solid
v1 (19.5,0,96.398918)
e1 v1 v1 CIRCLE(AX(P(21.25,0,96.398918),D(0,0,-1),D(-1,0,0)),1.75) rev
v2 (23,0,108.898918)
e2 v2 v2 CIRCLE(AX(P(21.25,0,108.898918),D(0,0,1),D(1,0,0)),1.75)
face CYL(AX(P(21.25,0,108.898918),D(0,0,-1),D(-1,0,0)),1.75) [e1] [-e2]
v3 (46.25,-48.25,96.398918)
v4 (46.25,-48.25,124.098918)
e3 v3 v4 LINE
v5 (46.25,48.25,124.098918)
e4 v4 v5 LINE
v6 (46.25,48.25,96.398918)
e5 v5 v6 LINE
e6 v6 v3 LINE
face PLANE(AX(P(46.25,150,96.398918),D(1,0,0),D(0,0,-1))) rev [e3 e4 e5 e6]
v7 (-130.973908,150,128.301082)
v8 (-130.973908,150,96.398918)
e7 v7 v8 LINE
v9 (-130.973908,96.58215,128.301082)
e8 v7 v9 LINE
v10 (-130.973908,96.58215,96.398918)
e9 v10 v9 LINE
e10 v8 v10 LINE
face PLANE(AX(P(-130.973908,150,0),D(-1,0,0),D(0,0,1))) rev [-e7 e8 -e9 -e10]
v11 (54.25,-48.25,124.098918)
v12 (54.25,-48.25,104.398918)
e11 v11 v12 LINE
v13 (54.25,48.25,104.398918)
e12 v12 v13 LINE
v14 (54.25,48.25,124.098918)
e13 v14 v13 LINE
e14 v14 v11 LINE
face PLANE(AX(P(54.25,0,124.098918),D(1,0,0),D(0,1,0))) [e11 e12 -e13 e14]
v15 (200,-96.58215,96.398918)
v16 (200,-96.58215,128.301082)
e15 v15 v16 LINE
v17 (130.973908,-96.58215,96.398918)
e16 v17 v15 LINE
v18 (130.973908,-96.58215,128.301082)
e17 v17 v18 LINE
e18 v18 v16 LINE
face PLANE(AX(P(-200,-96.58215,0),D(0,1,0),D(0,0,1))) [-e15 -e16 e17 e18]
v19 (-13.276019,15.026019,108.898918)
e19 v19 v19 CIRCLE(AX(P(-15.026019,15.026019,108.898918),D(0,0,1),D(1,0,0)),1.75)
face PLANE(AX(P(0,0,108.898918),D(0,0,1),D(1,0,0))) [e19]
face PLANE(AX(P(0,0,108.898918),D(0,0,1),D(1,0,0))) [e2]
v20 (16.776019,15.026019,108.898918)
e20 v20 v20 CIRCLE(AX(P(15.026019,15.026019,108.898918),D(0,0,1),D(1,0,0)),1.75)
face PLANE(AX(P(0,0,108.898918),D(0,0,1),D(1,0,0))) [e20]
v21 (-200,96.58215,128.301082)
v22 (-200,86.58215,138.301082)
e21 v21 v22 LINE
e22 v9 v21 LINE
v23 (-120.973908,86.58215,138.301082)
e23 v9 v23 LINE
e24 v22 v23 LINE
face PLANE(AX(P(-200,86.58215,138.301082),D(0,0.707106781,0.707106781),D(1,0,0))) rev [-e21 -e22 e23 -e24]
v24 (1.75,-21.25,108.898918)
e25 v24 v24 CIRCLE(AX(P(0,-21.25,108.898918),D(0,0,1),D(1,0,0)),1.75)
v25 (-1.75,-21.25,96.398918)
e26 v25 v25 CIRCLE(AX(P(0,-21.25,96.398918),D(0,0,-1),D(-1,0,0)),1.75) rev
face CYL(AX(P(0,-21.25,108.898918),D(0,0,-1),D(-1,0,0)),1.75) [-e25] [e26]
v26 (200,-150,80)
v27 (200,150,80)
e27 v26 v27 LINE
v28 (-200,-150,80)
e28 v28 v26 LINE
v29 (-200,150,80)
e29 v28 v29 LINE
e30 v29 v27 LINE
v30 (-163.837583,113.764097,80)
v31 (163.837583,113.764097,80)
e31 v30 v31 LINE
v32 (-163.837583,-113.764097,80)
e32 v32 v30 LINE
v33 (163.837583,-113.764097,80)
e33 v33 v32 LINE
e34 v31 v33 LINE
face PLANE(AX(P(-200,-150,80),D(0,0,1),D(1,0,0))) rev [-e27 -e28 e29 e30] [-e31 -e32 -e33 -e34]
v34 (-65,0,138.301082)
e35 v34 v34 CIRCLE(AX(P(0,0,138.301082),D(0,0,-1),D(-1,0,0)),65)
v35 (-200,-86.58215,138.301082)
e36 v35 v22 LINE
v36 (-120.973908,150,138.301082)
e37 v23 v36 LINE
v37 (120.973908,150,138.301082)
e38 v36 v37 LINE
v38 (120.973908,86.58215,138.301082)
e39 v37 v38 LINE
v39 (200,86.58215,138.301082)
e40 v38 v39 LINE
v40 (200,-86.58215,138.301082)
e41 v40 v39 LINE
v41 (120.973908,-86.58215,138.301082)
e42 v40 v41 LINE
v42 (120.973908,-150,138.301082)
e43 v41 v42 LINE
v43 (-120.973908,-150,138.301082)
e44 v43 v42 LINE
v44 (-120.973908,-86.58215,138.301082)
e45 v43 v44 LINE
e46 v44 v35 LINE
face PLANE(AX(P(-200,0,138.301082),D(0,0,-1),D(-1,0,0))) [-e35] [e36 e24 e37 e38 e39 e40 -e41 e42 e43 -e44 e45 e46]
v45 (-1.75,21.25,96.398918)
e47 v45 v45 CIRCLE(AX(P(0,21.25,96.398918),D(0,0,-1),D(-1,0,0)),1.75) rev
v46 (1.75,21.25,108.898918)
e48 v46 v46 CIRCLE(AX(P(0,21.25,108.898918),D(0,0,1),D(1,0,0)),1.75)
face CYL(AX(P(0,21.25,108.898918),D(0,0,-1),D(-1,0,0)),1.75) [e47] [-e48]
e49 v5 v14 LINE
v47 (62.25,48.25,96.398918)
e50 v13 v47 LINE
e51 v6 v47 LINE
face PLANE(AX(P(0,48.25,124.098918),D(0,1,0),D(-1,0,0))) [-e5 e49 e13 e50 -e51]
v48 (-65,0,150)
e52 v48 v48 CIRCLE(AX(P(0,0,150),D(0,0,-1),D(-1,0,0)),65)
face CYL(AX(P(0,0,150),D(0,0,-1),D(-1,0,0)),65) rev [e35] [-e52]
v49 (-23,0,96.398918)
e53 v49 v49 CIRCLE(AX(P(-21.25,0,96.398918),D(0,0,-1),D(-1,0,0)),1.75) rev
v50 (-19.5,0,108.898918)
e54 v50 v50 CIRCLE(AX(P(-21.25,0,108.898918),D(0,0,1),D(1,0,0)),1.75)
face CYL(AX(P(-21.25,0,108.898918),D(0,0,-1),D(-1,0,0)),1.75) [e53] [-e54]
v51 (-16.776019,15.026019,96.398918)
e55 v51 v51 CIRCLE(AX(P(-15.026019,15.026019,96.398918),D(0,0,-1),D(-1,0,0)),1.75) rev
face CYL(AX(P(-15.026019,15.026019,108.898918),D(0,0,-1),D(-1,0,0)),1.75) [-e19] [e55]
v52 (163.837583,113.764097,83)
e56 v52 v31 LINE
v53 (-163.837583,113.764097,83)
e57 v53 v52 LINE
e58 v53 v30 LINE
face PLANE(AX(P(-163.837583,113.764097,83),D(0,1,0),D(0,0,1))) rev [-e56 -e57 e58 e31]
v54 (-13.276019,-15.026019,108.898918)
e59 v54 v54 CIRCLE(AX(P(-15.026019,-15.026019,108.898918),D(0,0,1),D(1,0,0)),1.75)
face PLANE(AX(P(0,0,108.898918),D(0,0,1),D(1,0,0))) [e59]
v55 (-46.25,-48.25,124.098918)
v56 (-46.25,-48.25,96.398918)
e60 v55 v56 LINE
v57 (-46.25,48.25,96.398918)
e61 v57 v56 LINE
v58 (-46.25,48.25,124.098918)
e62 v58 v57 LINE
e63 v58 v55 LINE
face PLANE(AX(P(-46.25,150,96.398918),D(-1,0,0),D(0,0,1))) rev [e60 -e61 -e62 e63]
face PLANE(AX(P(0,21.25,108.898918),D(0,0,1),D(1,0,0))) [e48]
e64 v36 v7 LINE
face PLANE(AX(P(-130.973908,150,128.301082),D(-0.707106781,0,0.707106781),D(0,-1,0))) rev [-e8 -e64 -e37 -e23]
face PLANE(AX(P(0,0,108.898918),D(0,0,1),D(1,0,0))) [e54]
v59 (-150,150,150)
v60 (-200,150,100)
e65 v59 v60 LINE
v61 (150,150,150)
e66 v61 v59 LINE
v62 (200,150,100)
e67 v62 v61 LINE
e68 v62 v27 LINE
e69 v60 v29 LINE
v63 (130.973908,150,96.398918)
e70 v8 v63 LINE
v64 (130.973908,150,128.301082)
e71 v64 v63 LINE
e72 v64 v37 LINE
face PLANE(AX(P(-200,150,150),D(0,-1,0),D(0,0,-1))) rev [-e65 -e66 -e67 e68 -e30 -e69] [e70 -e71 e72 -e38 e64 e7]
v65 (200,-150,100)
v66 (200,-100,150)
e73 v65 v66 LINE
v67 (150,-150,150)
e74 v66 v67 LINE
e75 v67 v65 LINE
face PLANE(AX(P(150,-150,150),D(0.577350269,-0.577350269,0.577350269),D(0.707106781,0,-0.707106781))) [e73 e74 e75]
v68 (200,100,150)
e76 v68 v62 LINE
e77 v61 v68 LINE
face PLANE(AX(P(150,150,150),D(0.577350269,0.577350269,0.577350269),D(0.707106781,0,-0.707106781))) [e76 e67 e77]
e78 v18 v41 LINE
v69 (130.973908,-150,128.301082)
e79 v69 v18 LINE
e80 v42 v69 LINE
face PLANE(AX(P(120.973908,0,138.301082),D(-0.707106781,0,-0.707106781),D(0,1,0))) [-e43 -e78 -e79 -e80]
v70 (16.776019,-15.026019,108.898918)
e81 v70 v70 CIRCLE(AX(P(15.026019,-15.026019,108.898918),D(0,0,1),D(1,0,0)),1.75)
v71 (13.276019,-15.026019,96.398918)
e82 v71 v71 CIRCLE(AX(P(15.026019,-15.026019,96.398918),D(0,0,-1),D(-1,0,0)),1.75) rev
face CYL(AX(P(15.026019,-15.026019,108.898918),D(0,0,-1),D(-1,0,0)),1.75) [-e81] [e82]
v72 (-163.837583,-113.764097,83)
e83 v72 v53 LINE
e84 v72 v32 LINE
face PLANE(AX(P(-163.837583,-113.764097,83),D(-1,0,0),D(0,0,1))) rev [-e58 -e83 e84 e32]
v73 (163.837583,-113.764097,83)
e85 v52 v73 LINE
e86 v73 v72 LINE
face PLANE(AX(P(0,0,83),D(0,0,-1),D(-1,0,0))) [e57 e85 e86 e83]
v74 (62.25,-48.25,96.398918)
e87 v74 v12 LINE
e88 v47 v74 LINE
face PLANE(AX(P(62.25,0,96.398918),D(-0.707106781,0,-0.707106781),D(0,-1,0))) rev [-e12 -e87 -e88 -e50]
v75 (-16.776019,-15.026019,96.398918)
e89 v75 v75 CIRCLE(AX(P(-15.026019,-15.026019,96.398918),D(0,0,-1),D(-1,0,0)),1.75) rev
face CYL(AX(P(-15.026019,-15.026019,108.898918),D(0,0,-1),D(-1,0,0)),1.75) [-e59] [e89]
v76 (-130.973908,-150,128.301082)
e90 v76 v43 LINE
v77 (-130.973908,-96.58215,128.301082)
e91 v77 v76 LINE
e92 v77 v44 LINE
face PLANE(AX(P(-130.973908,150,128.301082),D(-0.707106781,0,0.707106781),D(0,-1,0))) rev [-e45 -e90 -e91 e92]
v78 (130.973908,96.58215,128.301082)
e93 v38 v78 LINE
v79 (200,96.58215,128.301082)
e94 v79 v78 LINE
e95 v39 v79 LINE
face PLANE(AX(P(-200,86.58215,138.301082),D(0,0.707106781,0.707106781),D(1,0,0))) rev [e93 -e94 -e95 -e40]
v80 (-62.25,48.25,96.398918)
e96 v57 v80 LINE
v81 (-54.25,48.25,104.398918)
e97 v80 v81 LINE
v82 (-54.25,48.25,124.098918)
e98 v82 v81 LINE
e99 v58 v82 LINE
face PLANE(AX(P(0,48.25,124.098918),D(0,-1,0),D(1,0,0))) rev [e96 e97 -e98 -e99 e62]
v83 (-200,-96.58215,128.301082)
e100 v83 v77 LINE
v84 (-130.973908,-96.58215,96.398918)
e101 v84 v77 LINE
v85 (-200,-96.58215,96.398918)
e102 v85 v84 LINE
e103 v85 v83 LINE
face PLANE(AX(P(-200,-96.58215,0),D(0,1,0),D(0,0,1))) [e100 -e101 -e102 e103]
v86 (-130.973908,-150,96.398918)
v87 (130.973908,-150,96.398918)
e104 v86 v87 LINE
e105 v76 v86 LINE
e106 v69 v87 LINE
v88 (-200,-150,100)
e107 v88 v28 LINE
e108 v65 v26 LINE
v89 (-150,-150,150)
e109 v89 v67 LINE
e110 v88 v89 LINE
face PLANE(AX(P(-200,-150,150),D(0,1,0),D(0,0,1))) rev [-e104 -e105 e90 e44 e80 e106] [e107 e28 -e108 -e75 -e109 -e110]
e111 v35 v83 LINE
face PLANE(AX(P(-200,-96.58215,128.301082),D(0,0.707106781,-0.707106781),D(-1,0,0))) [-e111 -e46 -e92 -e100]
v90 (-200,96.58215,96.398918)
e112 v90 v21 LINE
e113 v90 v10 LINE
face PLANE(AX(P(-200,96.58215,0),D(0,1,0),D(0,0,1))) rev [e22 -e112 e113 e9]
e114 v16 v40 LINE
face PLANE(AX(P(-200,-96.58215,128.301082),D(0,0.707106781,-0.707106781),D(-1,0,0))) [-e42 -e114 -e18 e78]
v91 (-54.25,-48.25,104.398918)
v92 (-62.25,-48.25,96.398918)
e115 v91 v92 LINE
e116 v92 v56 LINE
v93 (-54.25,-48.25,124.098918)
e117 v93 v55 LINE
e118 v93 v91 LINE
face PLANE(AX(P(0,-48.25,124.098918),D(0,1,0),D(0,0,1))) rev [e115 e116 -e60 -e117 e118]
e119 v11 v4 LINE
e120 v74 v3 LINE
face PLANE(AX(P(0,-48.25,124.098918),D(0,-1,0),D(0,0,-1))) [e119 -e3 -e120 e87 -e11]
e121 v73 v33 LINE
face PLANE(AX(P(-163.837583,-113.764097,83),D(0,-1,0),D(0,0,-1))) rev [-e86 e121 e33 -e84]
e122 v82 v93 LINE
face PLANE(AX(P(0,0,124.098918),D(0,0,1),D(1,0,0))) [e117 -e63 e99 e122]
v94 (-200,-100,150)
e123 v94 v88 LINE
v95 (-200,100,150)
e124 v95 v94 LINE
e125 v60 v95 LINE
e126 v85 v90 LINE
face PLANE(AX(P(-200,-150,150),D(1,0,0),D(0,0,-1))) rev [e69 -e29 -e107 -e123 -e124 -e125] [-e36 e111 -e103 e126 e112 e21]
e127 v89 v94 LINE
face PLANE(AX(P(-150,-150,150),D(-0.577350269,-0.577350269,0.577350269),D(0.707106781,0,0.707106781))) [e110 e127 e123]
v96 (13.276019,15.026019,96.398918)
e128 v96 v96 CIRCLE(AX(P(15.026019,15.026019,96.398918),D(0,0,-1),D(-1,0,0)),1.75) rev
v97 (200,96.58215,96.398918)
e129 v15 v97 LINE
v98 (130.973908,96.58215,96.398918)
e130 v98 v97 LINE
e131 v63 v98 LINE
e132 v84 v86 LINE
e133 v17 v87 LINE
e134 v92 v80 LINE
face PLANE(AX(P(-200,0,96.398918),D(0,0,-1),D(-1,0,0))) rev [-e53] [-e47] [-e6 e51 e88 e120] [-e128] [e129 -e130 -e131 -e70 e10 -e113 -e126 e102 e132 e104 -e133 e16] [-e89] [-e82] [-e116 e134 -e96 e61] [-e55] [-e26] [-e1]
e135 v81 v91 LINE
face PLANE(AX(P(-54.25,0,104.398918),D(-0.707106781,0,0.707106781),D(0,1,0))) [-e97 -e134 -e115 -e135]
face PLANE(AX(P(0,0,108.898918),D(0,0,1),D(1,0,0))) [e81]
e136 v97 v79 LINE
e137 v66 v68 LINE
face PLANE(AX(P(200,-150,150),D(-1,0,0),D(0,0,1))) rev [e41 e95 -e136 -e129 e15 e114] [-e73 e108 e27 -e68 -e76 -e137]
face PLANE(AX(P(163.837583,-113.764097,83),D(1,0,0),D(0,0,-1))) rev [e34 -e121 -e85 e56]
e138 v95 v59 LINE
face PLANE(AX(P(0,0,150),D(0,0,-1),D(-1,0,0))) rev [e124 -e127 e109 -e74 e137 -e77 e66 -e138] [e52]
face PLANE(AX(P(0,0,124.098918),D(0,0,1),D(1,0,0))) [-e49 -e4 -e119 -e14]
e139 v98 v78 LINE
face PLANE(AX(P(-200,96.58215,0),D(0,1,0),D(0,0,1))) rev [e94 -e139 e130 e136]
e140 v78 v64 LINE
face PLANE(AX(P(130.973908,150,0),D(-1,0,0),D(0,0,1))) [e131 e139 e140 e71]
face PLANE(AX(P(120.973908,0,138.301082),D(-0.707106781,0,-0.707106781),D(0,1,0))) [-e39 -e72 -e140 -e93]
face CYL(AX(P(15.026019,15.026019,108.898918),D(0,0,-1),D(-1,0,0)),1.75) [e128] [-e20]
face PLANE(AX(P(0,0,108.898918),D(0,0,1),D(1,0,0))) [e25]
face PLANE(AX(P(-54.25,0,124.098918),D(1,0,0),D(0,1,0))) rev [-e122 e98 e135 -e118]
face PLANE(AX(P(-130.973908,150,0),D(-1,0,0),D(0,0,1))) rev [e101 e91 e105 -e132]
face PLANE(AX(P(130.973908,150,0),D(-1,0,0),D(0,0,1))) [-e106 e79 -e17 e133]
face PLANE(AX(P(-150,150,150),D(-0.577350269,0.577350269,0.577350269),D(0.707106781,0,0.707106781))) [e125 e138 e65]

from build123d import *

# Parameters (mm, degrees)
SKETCH_4_W           = 400
SKETCH_4_H           = 300
EXTRUDE_1_DEPTH      = 150
SKETCH_5_R           = 48.25
CUT_EXTRUDE_1_DEPTH  = 42.3
SKETCH_6_W           = 96.5
SKETCH_6_H           = 19.3
CUT_EXTRUDE_2_DEPTH  = 391.512483795
CUT_EXTRUDE_3_DEPTH  = 453.769256907
SKETCH_8_W           = 326
SKETCH_8_H           = 226
CUT_EXTRUDE_5_DEPTH  = 10
SKETCH_9_R           = 48.25
CUT_EXTRUDE_6_DEPTH  = 10
CHAMFER_START        = 259.807621135
CHAMFER_1_OUTLINE_W  = 65
CHAMFER_1_OUTLINE_H  = 74
CHAMFER_1_DEPTH      = 30.192378865
CHAMFER_START_2      = -290
CHAMFER_2_OUTLINE_W  = 64
CHAMFER_2_OUTLINE_H  = 74
CHAMFER_2_DEPTH      = 30.192378865
CHAMFER_3_OUTLINE_W  = 64
CHAMFER_3_OUTLINE_H  = 74
CHAMFER_3_DEPTH      = 30.192378865
CHAMFER_4_OUTLINE_W  = 65
CHAMFER_4_OUTLINE_H  = 74
CHAMFER_4_DEPTH      = 30.192378865
SKETCH_10_W          = 400
SKETCH_10_H          = 50
CUT_EXTRUDE_7_DEPTH  = 391.512483795
SKETCH_11_W          = 340
SKETCH_11_H          = 240
CUT_EXTRUDE_8_DEPTH  = 10
SKETCH_12_W          = 400
SKETCH_12_H          = 30
CUT_EXTRUDE_9_DEPTH  = 391.512483795
SKETCH_13_W          = 41.9021645
SKETCH_13_H          = 193.164300696
SKETCH_13_W_2        = 19.3
SKETCH_13_H_2        = 96.5
CUT_EXTRUDE_10_DEPTH = 453.769256907
SKETCH_14_W          = 261.947815576
SKETCH_14_H          = 41.9021645
SKETCH_14_W_2        = 96.5
SKETCH_14_H_2        = 19.3
CUT_EXTRUDE_11_DEPTH = 391.512483795
SKETCH_16_R          = 65
SKETCH_16_R_2        = 48.25
CUT_EXTRUDE_12_DEPTH = 257.708036866
CHAMFER_5_SIZE       = 10
SKETCH_17_W          = 10
SKETCH_17_H          = 96.5
EXTRUDE_4_DEPTH      = 27.7
SKETCH_19_R          = 1.75
EXTRUDE_6_DEPTH      = 12.5
SKETCH_20_W          = 2
SKETCH_20_H          = 27.7
CUT_EXTRUDE_13_DEPTH = 320.065921872
CHAMFER_6_SIZE       = 8
SKETCH_21_W          = 327.675165592
SKETCH_21_H          = 227.528194438
CUT_EXTRUDE_14_DEPTH = 3


with BuildPart() as part:
    # 草图4 → 凸台-拉伸1 (new body)
    with BuildSketch(Plane.XY):
        Rectangle(SKETCH_4_W, SKETCH_4_H)
    extrude(amount=EXTRUDE_1_DEPTH)

    # 草图5 → 切除-拉伸1 (cut)
    with BuildSketch(Plane.XY.offset(150)):
        Circle(SKETCH_5_R)
    extrude(amount=-CUT_EXTRUDE_1_DEPTH, mode=Mode.SUBTRACT)

    # 草图6 → 切除-拉伸2 (cut, through all)
    with BuildSketch(Plane.XZ.offset(150)):
        with Locations((0, 117.35)):
            Rectangle(SKETCH_6_W, SKETCH_6_H)
    extrude(amount=-CUT_EXTRUDE_2_DEPTH, mode=Mode.SUBTRACT)

    # 草图7 → 切除-拉伸3 (cut, through all)
    with BuildSketch(Plane.ZY.offset(200)):
        Polygon((127, -48.25), (107.7, -48.25), (107.7, 48.25), (127, 48.25), (127, 0), align=None)
    extrude(amount=-CUT_EXTRUDE_3_DEPTH, mode=Mode.SUBTRACT)

    # 草图8 → 切除-拉伸5 (cut)
    with BuildSketch(Plane(origin=(0, 0, 0), x_dir=(-1, 0, 0), z_dir=(0, 0, -1))):
        Rectangle(SKETCH_8_W, SKETCH_8_H)
    extrude(amount=-CUT_EXTRUDE_5_DEPTH, mode=Mode.SUBTRACT)

    # 草图9 → 切除-拉伸6 (cut)
    with BuildSketch(Plane.XY.offset(107.7)):
        Circle(SKETCH_9_R)
    extrude(amount=-CUT_EXTRUDE_6_DEPTH, mode=Mode.SUBTRACT)

    # 倒角1: read off the stored shape, not the designer's step
    # 倒角1 outline → 倒角1 (cut)
    with BuildSketch(Plane(origin=(0, 0, 0), x_dir=(0.8164965809277258, -0.40824829046386313, -0.40824829046386313), z_dir=(0.5773502691896258, 0.5773502691896258, 0.5773502691896258)).offset(CHAMFER_START)):
        with Locations((30.5, 0)):
            Rectangle(CHAMFER_1_OUTLINE_W, CHAMFER_1_OUTLINE_H)
    extrude(amount=CHAMFER_1_DEPTH, mode=Mode.SUBTRACT)

    # 倒角2: read off the stored shape, not the designer's step
    # 倒角2 outline → 倒角2 (cut)
    with BuildSketch(Plane(origin=(0, 0, 0), x_dir=(0.8164965809277258, 0.40824829046386313, 0.40824829046386313), z_dir=(0.5773502691896258, -0.5773502691896258, -0.5773502691896258)).offset(CHAMFER_START_2)):
        with Locations((-31, 0)):
            Rectangle(CHAMFER_2_OUTLINE_W, CHAMFER_2_OUTLINE_H)
    extrude(amount=CHAMFER_2_DEPTH, mode=Mode.SUBTRACT)

    # 倒角3: read off the stored shape, not the designer's step
    # 倒角3 outline → 倒角3 (cut)
    with BuildSketch(Plane(origin=(0, 0, 0), x_dir=(0.8164965809277258, -0.40824829046386313, 0.40824829046386313), z_dir=(0.5773502691896258, 0.5773502691896258, -0.5773502691896258)).offset(CHAMFER_START_2)):
        with Locations((-31, 0)):
            Rectangle(CHAMFER_3_OUTLINE_W, CHAMFER_3_OUTLINE_H)
    extrude(amount=CHAMFER_3_DEPTH, mode=Mode.SUBTRACT)

    # 倒角4: read off the stored shape, not the designer's step
    # 倒角4 outline → 倒角4 (cut)
    with BuildSketch(Plane(origin=(0, 0, 0), x_dir=(0.8164965809277258, 0.40824829046386313, -0.40824829046386313), z_dir=(0.5773502691896258, -0.5773502691896258, 0.5773502691896258)).offset(CHAMFER_START)):
        with Locations((30.5, 0)):
            Rectangle(CHAMFER_4_OUTLINE_W, CHAMFER_4_OUTLINE_H)
    extrude(amount=CHAMFER_4_DEPTH, mode=Mode.SUBTRACT)

    # 草图10 → 切除-拉伸7 (cut, through all)
    with BuildSketch(Plane(origin=(0, 150, 0), x_dir=(1, 0, 0), z_dir=(0, 1, 0))):
        with Locations((0, -25)):
            Rectangle(SKETCH_10_W, SKETCH_10_H)
    extrude(amount=-CUT_EXTRUDE_7_DEPTH, mode=Mode.SUBTRACT)

    # 草图11 → 切除-拉伸8 (cut)
    with BuildSketch(Plane(origin=(0, 0, 50), x_dir=(-1, 0, 0), z_dir=(0, 0, -1))):
        Rectangle(SKETCH_11_W, SKETCH_11_H)
    extrude(amount=-CUT_EXTRUDE_8_DEPTH, mode=Mode.SUBTRACT)

    # 草图12 → 切除-拉伸9 (cut, through all)
    with BuildSketch(Plane(origin=(0, 150, 0), x_dir=(1, 0, 0), z_dir=(0, 1, 0))):
        with Locations((0, -65)):
            Rectangle(SKETCH_12_W, SKETCH_12_H)
    extrude(amount=-CUT_EXTRUDE_9_DEPTH, mode=Mode.SUBTRACT)

    # 草图13 → 切除-拉伸10 (cut, through all)
    with BuildSketch(Plane(origin=(200, 0, 0), x_dir=(0, 0, -1), z_dir=(1, 0, 0))):
        with Locations((-117.35, 0)):
            Rectangle(SKETCH_13_W, SKETCH_13_H)
        with Locations((-117.35, 0)):
            Rectangle(SKETCH_13_W_2, SKETCH_13_H_2, mode=Mode.SUBTRACT)
    extrude(amount=-CUT_EXTRUDE_10_DEPTH, mode=Mode.SUBTRACT)

    # 草图14 → 切除-拉伸11 (cut, through all)
    with BuildSketch(Plane.XZ.offset(150)):
        with Locations((0, 117.35)):
            Rectangle(SKETCH_14_W, SKETCH_14_H)
        with Locations((0, 117.35)):
            Rectangle(SKETCH_14_W_2, SKETCH_14_H_2, mode=Mode.SUBTRACT)
    extrude(amount=-CUT_EXTRUDE_11_DEPTH, mode=Mode.SUBTRACT)

    # 草图16 → 切除-拉伸12 (cut, through all)
    with BuildSketch(Plane(origin=(0, 0, 138.30108225), x_dir=(-1, 0, 0), z_dir=(0, 0, -1))):
        Circle(SKETCH_16_R)
        Circle(SKETCH_16_R_2, mode=Mode.SUBTRACT)
    extrude(amount=-CUT_EXTRUDE_12_DEPTH, mode=Mode.SUBTRACT)

    # 倒角5
    chamfer_5_edges = [part.edges().sort_by_distance(p)[0] for p in [
        (-165.486953894, -96.582150348, 138.30108225),
        (-165.486953894, 96.582150348, 138.30108225),
        (165.486953894, -96.582150348, 138.30108225),
        (165.486953894, 96.582150348, 138.30108225),
        (-130.973907788, 123.291075174, 138.30108225),
        (130.973907788, 123.291075174, 138.30108225),
        (130.973907788, -123.291075174, 138.30108225),
        (-130.973907788, -123.291075174, 138.30108225),
    ]]
    chamfer(chamfer_5_edges, length=CHAMFER_5_SIZE)

    # 草图17 → 凸台-拉伸4 (add)
    with BuildSketch(Plane.XY.offset(96.39891775)):
        with Locations((49.25, 0)):
            Rectangle(SKETCH_17_W, SKETCH_17_H)
        with Locations((-49.25, 0)):
            Rectangle(SKETCH_17_W, SKETCH_17_H)
    extrude(amount=EXTRUDE_4_DEPTH)

    # 草图19 → 凸台-拉伸6 (add)
    with BuildSketch(Plane.XY.offset(96.39891775)):
        with Locations(Location((-15.0260191, -15.0260191, 0), (0, 0, 180))):
            Circle(SKETCH_19_R)
        with Locations(Location((-21.25, 0, 0), (0, 0, 180))):
            Circle(SKETCH_19_R)
        with Locations(Location((-15.0260191, 15.0260191, 0), (0, 0, 180))):
            Circle(SKETCH_19_R)
        with Locations(Location((15.0260191, 15.0260191, 0), (0, 0, 180))):
            Circle(SKETCH_19_R)
        with Locations(Location((21.25, 0, 0), (0, 0, 180))):
            Circle(SKETCH_19_R)
        with Locations(Location((15.0260191, -15.0260191, 0), (0, 0, 180))):
            Circle(SKETCH_19_R)
        with Locations(Location((0, -21.25, 0), (0, 0, 180))):
            Circle(SKETCH_19_R)
        with Locations(Location((0, 21.25, 0), (0, 0, 180))):
            Circle(SKETCH_19_R)
    extrude(amount=EXTRUDE_6_DEPTH)

    # 草图20 → 切除-拉伸13 (cut, through all)
    with BuildSketch(Plane.XZ.offset(48.25)):
        with Locations((-45.25, 110.24891775)):
            Rectangle(SKETCH_20_W, SKETCH_20_H)
        with Locations((45.25, 110.24891775)):
            Rectangle(SKETCH_20_W, SKETCH_20_H)
    extrude(amount=-CUT_EXTRUDE_13_DEPTH, mode=Mode.SUBTRACT)

    # 倒角6
    chamfer_6_edges = [part.edges().sort_by_distance(p)[0] for p in [
        (54.25, 0, 96.39891775),
        (-54.25, 0, 96.39891775),
    ]]
    chamfer(chamfer_6_edges, length=CHAMFER_6_SIZE)

    # 草图21 → 切除-拉伸14 (cut)
    with BuildSketch(Plane(origin=(0, 0, 80), x_dir=(-1, 0, 0), z_dir=(0, 0, -1))):
        Rectangle(SKETCH_21_W, SKETCH_21_H)
    extrude(amount=-CUT_EXTRUDE_14_DEPTH, mode=Mode.SUBTRACT)


solid = part.part
